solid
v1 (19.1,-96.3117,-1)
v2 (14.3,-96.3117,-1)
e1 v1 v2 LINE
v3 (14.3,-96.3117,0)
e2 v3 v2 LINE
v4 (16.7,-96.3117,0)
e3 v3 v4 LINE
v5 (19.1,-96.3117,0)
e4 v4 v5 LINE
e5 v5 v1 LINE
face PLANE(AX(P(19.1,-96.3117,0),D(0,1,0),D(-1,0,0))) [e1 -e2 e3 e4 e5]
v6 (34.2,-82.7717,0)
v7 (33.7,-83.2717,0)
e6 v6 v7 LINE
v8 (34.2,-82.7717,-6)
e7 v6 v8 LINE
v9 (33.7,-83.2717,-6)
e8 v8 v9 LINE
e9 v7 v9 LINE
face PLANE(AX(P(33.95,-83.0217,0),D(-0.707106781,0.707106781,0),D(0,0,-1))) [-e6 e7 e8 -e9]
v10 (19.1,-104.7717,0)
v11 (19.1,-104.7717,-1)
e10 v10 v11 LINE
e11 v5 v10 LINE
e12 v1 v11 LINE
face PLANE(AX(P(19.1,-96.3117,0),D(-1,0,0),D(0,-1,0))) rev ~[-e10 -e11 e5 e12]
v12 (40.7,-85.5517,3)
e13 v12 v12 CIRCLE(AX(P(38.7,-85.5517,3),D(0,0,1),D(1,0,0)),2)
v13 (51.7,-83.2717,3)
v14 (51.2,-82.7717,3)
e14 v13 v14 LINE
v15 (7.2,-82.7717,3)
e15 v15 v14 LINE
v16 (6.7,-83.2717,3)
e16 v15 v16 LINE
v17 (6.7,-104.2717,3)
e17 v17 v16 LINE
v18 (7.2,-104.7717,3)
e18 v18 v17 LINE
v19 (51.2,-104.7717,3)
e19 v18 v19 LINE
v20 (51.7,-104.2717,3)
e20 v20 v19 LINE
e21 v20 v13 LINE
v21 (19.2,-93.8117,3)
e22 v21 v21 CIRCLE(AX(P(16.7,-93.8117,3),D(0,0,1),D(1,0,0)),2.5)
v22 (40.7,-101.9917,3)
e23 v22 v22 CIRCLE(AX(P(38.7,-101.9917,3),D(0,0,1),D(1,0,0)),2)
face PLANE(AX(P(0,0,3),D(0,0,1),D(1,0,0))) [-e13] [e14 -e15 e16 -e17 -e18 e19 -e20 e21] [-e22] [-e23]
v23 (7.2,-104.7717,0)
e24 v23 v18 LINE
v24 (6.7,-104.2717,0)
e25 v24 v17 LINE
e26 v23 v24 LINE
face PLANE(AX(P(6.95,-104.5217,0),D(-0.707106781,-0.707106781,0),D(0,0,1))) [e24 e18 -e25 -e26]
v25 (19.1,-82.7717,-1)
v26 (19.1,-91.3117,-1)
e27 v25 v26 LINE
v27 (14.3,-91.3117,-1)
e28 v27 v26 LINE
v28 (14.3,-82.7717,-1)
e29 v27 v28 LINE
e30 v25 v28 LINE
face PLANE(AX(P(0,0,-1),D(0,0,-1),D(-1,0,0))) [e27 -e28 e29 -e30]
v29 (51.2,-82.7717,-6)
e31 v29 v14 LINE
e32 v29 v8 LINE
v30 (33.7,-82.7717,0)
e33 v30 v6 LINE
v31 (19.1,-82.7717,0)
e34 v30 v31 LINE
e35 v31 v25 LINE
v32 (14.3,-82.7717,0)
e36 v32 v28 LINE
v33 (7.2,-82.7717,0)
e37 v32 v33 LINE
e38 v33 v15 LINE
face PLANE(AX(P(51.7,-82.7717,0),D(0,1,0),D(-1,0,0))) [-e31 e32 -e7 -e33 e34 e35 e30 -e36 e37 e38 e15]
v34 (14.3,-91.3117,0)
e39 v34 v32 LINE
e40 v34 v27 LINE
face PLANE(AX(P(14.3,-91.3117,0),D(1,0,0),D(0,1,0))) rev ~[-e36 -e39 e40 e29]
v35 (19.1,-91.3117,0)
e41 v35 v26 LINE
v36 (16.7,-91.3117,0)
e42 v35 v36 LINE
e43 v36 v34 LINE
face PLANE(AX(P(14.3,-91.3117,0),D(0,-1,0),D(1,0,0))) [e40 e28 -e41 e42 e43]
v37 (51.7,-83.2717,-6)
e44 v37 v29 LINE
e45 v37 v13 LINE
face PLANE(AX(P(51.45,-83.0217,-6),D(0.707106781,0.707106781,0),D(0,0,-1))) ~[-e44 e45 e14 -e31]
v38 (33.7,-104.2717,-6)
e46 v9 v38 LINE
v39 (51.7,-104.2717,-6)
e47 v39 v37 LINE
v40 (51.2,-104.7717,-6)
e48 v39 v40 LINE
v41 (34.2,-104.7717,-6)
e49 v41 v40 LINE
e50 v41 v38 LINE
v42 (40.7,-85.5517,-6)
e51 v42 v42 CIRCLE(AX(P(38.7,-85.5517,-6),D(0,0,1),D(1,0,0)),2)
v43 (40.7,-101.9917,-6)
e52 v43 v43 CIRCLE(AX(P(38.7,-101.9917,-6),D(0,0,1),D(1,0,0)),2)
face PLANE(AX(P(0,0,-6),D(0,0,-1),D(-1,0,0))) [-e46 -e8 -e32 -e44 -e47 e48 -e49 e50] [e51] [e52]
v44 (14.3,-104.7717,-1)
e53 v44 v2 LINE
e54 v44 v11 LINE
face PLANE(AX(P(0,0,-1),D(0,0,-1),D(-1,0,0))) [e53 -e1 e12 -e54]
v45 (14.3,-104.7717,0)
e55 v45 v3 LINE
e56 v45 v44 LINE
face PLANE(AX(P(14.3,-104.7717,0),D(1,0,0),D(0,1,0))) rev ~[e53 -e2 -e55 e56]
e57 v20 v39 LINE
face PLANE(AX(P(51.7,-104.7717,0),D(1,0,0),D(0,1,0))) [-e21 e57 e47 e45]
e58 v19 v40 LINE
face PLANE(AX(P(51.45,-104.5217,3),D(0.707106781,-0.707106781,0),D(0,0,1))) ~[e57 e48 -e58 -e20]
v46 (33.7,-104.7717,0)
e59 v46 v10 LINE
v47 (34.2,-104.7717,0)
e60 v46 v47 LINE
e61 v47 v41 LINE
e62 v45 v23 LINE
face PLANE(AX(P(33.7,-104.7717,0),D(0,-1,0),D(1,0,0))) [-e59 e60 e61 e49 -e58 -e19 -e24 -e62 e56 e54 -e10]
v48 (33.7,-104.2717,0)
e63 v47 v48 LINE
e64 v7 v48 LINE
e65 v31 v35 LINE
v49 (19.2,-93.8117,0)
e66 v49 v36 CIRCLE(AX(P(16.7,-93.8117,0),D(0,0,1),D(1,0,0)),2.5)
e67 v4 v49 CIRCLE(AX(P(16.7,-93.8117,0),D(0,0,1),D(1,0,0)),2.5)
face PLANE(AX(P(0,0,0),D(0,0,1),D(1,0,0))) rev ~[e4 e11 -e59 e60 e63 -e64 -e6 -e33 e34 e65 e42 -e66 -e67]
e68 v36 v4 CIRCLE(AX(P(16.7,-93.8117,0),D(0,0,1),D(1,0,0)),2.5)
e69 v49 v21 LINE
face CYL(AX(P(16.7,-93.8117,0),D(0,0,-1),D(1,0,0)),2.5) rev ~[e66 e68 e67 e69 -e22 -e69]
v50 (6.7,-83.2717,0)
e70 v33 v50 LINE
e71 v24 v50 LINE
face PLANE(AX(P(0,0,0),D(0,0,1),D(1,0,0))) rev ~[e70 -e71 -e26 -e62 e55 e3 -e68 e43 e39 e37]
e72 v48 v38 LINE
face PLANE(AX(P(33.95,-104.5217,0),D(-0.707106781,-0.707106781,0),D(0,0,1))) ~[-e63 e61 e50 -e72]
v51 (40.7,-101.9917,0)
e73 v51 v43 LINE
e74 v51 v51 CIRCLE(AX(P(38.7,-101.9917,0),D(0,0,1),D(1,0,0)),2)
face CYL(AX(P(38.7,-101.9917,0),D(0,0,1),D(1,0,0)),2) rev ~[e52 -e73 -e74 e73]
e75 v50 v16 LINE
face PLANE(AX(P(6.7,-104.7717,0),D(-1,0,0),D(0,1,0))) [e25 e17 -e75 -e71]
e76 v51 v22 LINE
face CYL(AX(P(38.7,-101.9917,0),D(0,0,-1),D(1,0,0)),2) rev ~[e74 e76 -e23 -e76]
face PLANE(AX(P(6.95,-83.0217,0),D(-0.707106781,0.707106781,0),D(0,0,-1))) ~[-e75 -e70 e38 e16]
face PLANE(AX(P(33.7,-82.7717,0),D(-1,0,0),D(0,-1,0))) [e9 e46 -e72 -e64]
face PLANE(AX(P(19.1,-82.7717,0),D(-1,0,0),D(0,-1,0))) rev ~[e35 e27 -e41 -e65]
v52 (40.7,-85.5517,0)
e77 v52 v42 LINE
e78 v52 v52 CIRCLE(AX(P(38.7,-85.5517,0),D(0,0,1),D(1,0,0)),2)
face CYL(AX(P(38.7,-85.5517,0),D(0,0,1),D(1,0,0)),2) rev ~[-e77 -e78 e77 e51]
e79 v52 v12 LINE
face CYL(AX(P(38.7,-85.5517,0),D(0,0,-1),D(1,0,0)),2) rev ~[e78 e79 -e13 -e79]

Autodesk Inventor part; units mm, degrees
ref_plane "YZ Plane" through (0, 0, 0) normal (1, 0, 0) x (0, 1, 0)
ref_plane "XZ Plane" through (0, 0, 0) normal (0, 1, 0) x (-1, 0, 0)
ref_plane "XY Plane" through (0, 0, 0) normal (0, 0, 1) x (1, 0, 0)
sketch "Sketch1" plane through (0, 0, 0) normal (0, 0, 1) x (1, 0, 0)
  line L0 (13.4, 187.5) -> (13.4, -187.5) projected
  line L1 (0, 187.5) -> (13.4, 187.5) projected
  line L2 (0, 187.5) -> (0, -187.5) projected
  line L3 (13.4, -187.5) -> (0, -187.5) projected
  line L4 (-6.6, 187.5) -> (-6.6, -187.5) projected
  line L5 (-11.3, 187.5) -> (-6.6, 187.5) projected
  line L6 (-11.3, 187.5) -> (-11.3, -187.5) projected
  line L7 (-6.6, -187.5) -> (-11.3, -187.5) projected
  line L8 (24.7, 187.5) -> (24.7, -187.5) projected
  line L9 (20, 187.5) -> (24.7, 187.5) projected
  line L10 (20, 187.5) -> (20, -187.5) projected
  line L11 (24.7, -187.5) -> (20, -187.5) projected
  line L12 (0, -104.7717) -> (51.7, -104.7717)
  line L13 (51.7, -104.7717) -> (51.7, -82.7717)
  line L14 (51.7, -82.7717) -> (0, -82.7717)
  line L15 (0, -82.7717) -> (0, -104.7717)
  line L16 (38.7, -104.7717) -> (38.7, -82.7717) construction
  line L17 (51.7, -93.7717) -> (36.1959, -93.7717) construction
  circle A0 centre (38.7, -101.9917) radius 2
  circle A1 centre (38.7, -85.5517) radius 2
  line L18 (13.4, -93.8117) -> (20, -93.8117) construction
  circle A2 centre (16.7, -93.8117) radius 2.5
  line L19 (6.7, -104.7717) -> (6.7, -82.7717)
  point P0 (0, 0)
  point P1 (0, -82.7717)
  dimension "d0" = 22
  dimension "d3" = 4
  dimension "d4" = 4
  dimension "d5" = 16.44
  dimension "d6" = 14
  dimension "d7" = 5
  dimension "d8" = 27
extrude "Extrusion1" add sketch "Sketch1" along normal blind 3 contours L14 L10 L12 L0 | L0 L12 L19 L14 | L14 L8 L12 L10 | L14 L13 L12 L8
sketch "Sketch2" plane through (0, 0, 0) normal (0, 0, -1) x (-1, 0, 0)
  line L0 (-14.2, 187.5) -> (-14.2, -187.5) projected
  line L1 (-19.2, 187.5) -> (-19.2, -187.5) projected
  line L2 (-51.7, -82.7717) -> (-6.7, -82.7717) projected
  line L3 (-6.7, -104.7717) -> (-51.7, -104.7717) projected
  line L4 (-51.7, -82.7717) -> (-6.7, -82.7717) projected
  line L5 (-14.3, -82.7717) -> (-19.1, -82.7717)
  line L6 (-19.1, -82.7717) -> (-19.1, -104.7717)
  line L7 (-19.1, -104.7717) -> (-14.3, -104.7717)
  line L8 (-14.3, -104.7717) -> (-14.3, -82.7717)
  circle A0 centre (-16.7, -93.8117) radius 2.5 projected
  line L9 (-19.1, -96.3117) -> (-14.3, -96.3117)
  line L10 (-14.3, -96.3117) -> (-14.3, -91.3117)
  line L11 (-14.3, -91.3117) -> (-19.1, -91.3117)
  line L12 (-19.1, -91.3117) -> (-19.1, -96.3117)
  line L13 (-19.1, -96.3117) -> (-14.3, -91.3117) construction
  line L14 (-14.3, -96.3117) -> (-19.1, -91.3117) construction
  point P0 (0, 0)
  dimension "d9" = 0.1
  dimension "d10" = 0.1
extrude "Extrusion2" add sketch "Sketch2" along normal blind 1 contours L8 L11 L6 L2 | L3 L6 L9 L8
sketch "Sketch3" plane through (0, 0, 0) normal (0, 0, -1) x (-1, 0, 0)
  line L0 (-51.7, -104.7717) -> (-51.7, -82.7717) projected
  line L1 (-6.7, -104.7717) -> (-51.7, -104.7717) projected
  line L2 (-51.7, -82.7717) -> (-33.7, -82.7717)
  line L3 (-33.7, -82.7717) -> (-33.7, -104.7717)
  line L4 (-33.7, -104.7717) -> (-51.7, -104.7717)
  line L5 (-51.7, -104.7717) -> (-51.7, -82.7717)
  point P0 (0, 0)
  dimension "d13" = 18
extrude "Extrusion3" add sketch "Sketch3" along normal blind 6
thicken "Thicken1" operation cut thickness 6 both sides no extend neighbours no toward (0, 0, -1) faces at (38.1097, -101.6818, 0)
thicken "Thicken2" operation cut thickness 6 both sides no extend neighbours no toward (0, 0, -1) faces at (38.1097, -85.2418, 0)
chamfer "Chamfer1" distance 0.5 angle 45 6 edges at (33.7, -104.7717, -3) (33.7, -82.7717, -3) (51.7, -104.7717, -1.5) (51.7, -82.7717, -1.5) (6.7, -104.7717, 1.5) (6.7, -82.7717, 1.5)
properties part number "halter_induktivsensor_klein"
